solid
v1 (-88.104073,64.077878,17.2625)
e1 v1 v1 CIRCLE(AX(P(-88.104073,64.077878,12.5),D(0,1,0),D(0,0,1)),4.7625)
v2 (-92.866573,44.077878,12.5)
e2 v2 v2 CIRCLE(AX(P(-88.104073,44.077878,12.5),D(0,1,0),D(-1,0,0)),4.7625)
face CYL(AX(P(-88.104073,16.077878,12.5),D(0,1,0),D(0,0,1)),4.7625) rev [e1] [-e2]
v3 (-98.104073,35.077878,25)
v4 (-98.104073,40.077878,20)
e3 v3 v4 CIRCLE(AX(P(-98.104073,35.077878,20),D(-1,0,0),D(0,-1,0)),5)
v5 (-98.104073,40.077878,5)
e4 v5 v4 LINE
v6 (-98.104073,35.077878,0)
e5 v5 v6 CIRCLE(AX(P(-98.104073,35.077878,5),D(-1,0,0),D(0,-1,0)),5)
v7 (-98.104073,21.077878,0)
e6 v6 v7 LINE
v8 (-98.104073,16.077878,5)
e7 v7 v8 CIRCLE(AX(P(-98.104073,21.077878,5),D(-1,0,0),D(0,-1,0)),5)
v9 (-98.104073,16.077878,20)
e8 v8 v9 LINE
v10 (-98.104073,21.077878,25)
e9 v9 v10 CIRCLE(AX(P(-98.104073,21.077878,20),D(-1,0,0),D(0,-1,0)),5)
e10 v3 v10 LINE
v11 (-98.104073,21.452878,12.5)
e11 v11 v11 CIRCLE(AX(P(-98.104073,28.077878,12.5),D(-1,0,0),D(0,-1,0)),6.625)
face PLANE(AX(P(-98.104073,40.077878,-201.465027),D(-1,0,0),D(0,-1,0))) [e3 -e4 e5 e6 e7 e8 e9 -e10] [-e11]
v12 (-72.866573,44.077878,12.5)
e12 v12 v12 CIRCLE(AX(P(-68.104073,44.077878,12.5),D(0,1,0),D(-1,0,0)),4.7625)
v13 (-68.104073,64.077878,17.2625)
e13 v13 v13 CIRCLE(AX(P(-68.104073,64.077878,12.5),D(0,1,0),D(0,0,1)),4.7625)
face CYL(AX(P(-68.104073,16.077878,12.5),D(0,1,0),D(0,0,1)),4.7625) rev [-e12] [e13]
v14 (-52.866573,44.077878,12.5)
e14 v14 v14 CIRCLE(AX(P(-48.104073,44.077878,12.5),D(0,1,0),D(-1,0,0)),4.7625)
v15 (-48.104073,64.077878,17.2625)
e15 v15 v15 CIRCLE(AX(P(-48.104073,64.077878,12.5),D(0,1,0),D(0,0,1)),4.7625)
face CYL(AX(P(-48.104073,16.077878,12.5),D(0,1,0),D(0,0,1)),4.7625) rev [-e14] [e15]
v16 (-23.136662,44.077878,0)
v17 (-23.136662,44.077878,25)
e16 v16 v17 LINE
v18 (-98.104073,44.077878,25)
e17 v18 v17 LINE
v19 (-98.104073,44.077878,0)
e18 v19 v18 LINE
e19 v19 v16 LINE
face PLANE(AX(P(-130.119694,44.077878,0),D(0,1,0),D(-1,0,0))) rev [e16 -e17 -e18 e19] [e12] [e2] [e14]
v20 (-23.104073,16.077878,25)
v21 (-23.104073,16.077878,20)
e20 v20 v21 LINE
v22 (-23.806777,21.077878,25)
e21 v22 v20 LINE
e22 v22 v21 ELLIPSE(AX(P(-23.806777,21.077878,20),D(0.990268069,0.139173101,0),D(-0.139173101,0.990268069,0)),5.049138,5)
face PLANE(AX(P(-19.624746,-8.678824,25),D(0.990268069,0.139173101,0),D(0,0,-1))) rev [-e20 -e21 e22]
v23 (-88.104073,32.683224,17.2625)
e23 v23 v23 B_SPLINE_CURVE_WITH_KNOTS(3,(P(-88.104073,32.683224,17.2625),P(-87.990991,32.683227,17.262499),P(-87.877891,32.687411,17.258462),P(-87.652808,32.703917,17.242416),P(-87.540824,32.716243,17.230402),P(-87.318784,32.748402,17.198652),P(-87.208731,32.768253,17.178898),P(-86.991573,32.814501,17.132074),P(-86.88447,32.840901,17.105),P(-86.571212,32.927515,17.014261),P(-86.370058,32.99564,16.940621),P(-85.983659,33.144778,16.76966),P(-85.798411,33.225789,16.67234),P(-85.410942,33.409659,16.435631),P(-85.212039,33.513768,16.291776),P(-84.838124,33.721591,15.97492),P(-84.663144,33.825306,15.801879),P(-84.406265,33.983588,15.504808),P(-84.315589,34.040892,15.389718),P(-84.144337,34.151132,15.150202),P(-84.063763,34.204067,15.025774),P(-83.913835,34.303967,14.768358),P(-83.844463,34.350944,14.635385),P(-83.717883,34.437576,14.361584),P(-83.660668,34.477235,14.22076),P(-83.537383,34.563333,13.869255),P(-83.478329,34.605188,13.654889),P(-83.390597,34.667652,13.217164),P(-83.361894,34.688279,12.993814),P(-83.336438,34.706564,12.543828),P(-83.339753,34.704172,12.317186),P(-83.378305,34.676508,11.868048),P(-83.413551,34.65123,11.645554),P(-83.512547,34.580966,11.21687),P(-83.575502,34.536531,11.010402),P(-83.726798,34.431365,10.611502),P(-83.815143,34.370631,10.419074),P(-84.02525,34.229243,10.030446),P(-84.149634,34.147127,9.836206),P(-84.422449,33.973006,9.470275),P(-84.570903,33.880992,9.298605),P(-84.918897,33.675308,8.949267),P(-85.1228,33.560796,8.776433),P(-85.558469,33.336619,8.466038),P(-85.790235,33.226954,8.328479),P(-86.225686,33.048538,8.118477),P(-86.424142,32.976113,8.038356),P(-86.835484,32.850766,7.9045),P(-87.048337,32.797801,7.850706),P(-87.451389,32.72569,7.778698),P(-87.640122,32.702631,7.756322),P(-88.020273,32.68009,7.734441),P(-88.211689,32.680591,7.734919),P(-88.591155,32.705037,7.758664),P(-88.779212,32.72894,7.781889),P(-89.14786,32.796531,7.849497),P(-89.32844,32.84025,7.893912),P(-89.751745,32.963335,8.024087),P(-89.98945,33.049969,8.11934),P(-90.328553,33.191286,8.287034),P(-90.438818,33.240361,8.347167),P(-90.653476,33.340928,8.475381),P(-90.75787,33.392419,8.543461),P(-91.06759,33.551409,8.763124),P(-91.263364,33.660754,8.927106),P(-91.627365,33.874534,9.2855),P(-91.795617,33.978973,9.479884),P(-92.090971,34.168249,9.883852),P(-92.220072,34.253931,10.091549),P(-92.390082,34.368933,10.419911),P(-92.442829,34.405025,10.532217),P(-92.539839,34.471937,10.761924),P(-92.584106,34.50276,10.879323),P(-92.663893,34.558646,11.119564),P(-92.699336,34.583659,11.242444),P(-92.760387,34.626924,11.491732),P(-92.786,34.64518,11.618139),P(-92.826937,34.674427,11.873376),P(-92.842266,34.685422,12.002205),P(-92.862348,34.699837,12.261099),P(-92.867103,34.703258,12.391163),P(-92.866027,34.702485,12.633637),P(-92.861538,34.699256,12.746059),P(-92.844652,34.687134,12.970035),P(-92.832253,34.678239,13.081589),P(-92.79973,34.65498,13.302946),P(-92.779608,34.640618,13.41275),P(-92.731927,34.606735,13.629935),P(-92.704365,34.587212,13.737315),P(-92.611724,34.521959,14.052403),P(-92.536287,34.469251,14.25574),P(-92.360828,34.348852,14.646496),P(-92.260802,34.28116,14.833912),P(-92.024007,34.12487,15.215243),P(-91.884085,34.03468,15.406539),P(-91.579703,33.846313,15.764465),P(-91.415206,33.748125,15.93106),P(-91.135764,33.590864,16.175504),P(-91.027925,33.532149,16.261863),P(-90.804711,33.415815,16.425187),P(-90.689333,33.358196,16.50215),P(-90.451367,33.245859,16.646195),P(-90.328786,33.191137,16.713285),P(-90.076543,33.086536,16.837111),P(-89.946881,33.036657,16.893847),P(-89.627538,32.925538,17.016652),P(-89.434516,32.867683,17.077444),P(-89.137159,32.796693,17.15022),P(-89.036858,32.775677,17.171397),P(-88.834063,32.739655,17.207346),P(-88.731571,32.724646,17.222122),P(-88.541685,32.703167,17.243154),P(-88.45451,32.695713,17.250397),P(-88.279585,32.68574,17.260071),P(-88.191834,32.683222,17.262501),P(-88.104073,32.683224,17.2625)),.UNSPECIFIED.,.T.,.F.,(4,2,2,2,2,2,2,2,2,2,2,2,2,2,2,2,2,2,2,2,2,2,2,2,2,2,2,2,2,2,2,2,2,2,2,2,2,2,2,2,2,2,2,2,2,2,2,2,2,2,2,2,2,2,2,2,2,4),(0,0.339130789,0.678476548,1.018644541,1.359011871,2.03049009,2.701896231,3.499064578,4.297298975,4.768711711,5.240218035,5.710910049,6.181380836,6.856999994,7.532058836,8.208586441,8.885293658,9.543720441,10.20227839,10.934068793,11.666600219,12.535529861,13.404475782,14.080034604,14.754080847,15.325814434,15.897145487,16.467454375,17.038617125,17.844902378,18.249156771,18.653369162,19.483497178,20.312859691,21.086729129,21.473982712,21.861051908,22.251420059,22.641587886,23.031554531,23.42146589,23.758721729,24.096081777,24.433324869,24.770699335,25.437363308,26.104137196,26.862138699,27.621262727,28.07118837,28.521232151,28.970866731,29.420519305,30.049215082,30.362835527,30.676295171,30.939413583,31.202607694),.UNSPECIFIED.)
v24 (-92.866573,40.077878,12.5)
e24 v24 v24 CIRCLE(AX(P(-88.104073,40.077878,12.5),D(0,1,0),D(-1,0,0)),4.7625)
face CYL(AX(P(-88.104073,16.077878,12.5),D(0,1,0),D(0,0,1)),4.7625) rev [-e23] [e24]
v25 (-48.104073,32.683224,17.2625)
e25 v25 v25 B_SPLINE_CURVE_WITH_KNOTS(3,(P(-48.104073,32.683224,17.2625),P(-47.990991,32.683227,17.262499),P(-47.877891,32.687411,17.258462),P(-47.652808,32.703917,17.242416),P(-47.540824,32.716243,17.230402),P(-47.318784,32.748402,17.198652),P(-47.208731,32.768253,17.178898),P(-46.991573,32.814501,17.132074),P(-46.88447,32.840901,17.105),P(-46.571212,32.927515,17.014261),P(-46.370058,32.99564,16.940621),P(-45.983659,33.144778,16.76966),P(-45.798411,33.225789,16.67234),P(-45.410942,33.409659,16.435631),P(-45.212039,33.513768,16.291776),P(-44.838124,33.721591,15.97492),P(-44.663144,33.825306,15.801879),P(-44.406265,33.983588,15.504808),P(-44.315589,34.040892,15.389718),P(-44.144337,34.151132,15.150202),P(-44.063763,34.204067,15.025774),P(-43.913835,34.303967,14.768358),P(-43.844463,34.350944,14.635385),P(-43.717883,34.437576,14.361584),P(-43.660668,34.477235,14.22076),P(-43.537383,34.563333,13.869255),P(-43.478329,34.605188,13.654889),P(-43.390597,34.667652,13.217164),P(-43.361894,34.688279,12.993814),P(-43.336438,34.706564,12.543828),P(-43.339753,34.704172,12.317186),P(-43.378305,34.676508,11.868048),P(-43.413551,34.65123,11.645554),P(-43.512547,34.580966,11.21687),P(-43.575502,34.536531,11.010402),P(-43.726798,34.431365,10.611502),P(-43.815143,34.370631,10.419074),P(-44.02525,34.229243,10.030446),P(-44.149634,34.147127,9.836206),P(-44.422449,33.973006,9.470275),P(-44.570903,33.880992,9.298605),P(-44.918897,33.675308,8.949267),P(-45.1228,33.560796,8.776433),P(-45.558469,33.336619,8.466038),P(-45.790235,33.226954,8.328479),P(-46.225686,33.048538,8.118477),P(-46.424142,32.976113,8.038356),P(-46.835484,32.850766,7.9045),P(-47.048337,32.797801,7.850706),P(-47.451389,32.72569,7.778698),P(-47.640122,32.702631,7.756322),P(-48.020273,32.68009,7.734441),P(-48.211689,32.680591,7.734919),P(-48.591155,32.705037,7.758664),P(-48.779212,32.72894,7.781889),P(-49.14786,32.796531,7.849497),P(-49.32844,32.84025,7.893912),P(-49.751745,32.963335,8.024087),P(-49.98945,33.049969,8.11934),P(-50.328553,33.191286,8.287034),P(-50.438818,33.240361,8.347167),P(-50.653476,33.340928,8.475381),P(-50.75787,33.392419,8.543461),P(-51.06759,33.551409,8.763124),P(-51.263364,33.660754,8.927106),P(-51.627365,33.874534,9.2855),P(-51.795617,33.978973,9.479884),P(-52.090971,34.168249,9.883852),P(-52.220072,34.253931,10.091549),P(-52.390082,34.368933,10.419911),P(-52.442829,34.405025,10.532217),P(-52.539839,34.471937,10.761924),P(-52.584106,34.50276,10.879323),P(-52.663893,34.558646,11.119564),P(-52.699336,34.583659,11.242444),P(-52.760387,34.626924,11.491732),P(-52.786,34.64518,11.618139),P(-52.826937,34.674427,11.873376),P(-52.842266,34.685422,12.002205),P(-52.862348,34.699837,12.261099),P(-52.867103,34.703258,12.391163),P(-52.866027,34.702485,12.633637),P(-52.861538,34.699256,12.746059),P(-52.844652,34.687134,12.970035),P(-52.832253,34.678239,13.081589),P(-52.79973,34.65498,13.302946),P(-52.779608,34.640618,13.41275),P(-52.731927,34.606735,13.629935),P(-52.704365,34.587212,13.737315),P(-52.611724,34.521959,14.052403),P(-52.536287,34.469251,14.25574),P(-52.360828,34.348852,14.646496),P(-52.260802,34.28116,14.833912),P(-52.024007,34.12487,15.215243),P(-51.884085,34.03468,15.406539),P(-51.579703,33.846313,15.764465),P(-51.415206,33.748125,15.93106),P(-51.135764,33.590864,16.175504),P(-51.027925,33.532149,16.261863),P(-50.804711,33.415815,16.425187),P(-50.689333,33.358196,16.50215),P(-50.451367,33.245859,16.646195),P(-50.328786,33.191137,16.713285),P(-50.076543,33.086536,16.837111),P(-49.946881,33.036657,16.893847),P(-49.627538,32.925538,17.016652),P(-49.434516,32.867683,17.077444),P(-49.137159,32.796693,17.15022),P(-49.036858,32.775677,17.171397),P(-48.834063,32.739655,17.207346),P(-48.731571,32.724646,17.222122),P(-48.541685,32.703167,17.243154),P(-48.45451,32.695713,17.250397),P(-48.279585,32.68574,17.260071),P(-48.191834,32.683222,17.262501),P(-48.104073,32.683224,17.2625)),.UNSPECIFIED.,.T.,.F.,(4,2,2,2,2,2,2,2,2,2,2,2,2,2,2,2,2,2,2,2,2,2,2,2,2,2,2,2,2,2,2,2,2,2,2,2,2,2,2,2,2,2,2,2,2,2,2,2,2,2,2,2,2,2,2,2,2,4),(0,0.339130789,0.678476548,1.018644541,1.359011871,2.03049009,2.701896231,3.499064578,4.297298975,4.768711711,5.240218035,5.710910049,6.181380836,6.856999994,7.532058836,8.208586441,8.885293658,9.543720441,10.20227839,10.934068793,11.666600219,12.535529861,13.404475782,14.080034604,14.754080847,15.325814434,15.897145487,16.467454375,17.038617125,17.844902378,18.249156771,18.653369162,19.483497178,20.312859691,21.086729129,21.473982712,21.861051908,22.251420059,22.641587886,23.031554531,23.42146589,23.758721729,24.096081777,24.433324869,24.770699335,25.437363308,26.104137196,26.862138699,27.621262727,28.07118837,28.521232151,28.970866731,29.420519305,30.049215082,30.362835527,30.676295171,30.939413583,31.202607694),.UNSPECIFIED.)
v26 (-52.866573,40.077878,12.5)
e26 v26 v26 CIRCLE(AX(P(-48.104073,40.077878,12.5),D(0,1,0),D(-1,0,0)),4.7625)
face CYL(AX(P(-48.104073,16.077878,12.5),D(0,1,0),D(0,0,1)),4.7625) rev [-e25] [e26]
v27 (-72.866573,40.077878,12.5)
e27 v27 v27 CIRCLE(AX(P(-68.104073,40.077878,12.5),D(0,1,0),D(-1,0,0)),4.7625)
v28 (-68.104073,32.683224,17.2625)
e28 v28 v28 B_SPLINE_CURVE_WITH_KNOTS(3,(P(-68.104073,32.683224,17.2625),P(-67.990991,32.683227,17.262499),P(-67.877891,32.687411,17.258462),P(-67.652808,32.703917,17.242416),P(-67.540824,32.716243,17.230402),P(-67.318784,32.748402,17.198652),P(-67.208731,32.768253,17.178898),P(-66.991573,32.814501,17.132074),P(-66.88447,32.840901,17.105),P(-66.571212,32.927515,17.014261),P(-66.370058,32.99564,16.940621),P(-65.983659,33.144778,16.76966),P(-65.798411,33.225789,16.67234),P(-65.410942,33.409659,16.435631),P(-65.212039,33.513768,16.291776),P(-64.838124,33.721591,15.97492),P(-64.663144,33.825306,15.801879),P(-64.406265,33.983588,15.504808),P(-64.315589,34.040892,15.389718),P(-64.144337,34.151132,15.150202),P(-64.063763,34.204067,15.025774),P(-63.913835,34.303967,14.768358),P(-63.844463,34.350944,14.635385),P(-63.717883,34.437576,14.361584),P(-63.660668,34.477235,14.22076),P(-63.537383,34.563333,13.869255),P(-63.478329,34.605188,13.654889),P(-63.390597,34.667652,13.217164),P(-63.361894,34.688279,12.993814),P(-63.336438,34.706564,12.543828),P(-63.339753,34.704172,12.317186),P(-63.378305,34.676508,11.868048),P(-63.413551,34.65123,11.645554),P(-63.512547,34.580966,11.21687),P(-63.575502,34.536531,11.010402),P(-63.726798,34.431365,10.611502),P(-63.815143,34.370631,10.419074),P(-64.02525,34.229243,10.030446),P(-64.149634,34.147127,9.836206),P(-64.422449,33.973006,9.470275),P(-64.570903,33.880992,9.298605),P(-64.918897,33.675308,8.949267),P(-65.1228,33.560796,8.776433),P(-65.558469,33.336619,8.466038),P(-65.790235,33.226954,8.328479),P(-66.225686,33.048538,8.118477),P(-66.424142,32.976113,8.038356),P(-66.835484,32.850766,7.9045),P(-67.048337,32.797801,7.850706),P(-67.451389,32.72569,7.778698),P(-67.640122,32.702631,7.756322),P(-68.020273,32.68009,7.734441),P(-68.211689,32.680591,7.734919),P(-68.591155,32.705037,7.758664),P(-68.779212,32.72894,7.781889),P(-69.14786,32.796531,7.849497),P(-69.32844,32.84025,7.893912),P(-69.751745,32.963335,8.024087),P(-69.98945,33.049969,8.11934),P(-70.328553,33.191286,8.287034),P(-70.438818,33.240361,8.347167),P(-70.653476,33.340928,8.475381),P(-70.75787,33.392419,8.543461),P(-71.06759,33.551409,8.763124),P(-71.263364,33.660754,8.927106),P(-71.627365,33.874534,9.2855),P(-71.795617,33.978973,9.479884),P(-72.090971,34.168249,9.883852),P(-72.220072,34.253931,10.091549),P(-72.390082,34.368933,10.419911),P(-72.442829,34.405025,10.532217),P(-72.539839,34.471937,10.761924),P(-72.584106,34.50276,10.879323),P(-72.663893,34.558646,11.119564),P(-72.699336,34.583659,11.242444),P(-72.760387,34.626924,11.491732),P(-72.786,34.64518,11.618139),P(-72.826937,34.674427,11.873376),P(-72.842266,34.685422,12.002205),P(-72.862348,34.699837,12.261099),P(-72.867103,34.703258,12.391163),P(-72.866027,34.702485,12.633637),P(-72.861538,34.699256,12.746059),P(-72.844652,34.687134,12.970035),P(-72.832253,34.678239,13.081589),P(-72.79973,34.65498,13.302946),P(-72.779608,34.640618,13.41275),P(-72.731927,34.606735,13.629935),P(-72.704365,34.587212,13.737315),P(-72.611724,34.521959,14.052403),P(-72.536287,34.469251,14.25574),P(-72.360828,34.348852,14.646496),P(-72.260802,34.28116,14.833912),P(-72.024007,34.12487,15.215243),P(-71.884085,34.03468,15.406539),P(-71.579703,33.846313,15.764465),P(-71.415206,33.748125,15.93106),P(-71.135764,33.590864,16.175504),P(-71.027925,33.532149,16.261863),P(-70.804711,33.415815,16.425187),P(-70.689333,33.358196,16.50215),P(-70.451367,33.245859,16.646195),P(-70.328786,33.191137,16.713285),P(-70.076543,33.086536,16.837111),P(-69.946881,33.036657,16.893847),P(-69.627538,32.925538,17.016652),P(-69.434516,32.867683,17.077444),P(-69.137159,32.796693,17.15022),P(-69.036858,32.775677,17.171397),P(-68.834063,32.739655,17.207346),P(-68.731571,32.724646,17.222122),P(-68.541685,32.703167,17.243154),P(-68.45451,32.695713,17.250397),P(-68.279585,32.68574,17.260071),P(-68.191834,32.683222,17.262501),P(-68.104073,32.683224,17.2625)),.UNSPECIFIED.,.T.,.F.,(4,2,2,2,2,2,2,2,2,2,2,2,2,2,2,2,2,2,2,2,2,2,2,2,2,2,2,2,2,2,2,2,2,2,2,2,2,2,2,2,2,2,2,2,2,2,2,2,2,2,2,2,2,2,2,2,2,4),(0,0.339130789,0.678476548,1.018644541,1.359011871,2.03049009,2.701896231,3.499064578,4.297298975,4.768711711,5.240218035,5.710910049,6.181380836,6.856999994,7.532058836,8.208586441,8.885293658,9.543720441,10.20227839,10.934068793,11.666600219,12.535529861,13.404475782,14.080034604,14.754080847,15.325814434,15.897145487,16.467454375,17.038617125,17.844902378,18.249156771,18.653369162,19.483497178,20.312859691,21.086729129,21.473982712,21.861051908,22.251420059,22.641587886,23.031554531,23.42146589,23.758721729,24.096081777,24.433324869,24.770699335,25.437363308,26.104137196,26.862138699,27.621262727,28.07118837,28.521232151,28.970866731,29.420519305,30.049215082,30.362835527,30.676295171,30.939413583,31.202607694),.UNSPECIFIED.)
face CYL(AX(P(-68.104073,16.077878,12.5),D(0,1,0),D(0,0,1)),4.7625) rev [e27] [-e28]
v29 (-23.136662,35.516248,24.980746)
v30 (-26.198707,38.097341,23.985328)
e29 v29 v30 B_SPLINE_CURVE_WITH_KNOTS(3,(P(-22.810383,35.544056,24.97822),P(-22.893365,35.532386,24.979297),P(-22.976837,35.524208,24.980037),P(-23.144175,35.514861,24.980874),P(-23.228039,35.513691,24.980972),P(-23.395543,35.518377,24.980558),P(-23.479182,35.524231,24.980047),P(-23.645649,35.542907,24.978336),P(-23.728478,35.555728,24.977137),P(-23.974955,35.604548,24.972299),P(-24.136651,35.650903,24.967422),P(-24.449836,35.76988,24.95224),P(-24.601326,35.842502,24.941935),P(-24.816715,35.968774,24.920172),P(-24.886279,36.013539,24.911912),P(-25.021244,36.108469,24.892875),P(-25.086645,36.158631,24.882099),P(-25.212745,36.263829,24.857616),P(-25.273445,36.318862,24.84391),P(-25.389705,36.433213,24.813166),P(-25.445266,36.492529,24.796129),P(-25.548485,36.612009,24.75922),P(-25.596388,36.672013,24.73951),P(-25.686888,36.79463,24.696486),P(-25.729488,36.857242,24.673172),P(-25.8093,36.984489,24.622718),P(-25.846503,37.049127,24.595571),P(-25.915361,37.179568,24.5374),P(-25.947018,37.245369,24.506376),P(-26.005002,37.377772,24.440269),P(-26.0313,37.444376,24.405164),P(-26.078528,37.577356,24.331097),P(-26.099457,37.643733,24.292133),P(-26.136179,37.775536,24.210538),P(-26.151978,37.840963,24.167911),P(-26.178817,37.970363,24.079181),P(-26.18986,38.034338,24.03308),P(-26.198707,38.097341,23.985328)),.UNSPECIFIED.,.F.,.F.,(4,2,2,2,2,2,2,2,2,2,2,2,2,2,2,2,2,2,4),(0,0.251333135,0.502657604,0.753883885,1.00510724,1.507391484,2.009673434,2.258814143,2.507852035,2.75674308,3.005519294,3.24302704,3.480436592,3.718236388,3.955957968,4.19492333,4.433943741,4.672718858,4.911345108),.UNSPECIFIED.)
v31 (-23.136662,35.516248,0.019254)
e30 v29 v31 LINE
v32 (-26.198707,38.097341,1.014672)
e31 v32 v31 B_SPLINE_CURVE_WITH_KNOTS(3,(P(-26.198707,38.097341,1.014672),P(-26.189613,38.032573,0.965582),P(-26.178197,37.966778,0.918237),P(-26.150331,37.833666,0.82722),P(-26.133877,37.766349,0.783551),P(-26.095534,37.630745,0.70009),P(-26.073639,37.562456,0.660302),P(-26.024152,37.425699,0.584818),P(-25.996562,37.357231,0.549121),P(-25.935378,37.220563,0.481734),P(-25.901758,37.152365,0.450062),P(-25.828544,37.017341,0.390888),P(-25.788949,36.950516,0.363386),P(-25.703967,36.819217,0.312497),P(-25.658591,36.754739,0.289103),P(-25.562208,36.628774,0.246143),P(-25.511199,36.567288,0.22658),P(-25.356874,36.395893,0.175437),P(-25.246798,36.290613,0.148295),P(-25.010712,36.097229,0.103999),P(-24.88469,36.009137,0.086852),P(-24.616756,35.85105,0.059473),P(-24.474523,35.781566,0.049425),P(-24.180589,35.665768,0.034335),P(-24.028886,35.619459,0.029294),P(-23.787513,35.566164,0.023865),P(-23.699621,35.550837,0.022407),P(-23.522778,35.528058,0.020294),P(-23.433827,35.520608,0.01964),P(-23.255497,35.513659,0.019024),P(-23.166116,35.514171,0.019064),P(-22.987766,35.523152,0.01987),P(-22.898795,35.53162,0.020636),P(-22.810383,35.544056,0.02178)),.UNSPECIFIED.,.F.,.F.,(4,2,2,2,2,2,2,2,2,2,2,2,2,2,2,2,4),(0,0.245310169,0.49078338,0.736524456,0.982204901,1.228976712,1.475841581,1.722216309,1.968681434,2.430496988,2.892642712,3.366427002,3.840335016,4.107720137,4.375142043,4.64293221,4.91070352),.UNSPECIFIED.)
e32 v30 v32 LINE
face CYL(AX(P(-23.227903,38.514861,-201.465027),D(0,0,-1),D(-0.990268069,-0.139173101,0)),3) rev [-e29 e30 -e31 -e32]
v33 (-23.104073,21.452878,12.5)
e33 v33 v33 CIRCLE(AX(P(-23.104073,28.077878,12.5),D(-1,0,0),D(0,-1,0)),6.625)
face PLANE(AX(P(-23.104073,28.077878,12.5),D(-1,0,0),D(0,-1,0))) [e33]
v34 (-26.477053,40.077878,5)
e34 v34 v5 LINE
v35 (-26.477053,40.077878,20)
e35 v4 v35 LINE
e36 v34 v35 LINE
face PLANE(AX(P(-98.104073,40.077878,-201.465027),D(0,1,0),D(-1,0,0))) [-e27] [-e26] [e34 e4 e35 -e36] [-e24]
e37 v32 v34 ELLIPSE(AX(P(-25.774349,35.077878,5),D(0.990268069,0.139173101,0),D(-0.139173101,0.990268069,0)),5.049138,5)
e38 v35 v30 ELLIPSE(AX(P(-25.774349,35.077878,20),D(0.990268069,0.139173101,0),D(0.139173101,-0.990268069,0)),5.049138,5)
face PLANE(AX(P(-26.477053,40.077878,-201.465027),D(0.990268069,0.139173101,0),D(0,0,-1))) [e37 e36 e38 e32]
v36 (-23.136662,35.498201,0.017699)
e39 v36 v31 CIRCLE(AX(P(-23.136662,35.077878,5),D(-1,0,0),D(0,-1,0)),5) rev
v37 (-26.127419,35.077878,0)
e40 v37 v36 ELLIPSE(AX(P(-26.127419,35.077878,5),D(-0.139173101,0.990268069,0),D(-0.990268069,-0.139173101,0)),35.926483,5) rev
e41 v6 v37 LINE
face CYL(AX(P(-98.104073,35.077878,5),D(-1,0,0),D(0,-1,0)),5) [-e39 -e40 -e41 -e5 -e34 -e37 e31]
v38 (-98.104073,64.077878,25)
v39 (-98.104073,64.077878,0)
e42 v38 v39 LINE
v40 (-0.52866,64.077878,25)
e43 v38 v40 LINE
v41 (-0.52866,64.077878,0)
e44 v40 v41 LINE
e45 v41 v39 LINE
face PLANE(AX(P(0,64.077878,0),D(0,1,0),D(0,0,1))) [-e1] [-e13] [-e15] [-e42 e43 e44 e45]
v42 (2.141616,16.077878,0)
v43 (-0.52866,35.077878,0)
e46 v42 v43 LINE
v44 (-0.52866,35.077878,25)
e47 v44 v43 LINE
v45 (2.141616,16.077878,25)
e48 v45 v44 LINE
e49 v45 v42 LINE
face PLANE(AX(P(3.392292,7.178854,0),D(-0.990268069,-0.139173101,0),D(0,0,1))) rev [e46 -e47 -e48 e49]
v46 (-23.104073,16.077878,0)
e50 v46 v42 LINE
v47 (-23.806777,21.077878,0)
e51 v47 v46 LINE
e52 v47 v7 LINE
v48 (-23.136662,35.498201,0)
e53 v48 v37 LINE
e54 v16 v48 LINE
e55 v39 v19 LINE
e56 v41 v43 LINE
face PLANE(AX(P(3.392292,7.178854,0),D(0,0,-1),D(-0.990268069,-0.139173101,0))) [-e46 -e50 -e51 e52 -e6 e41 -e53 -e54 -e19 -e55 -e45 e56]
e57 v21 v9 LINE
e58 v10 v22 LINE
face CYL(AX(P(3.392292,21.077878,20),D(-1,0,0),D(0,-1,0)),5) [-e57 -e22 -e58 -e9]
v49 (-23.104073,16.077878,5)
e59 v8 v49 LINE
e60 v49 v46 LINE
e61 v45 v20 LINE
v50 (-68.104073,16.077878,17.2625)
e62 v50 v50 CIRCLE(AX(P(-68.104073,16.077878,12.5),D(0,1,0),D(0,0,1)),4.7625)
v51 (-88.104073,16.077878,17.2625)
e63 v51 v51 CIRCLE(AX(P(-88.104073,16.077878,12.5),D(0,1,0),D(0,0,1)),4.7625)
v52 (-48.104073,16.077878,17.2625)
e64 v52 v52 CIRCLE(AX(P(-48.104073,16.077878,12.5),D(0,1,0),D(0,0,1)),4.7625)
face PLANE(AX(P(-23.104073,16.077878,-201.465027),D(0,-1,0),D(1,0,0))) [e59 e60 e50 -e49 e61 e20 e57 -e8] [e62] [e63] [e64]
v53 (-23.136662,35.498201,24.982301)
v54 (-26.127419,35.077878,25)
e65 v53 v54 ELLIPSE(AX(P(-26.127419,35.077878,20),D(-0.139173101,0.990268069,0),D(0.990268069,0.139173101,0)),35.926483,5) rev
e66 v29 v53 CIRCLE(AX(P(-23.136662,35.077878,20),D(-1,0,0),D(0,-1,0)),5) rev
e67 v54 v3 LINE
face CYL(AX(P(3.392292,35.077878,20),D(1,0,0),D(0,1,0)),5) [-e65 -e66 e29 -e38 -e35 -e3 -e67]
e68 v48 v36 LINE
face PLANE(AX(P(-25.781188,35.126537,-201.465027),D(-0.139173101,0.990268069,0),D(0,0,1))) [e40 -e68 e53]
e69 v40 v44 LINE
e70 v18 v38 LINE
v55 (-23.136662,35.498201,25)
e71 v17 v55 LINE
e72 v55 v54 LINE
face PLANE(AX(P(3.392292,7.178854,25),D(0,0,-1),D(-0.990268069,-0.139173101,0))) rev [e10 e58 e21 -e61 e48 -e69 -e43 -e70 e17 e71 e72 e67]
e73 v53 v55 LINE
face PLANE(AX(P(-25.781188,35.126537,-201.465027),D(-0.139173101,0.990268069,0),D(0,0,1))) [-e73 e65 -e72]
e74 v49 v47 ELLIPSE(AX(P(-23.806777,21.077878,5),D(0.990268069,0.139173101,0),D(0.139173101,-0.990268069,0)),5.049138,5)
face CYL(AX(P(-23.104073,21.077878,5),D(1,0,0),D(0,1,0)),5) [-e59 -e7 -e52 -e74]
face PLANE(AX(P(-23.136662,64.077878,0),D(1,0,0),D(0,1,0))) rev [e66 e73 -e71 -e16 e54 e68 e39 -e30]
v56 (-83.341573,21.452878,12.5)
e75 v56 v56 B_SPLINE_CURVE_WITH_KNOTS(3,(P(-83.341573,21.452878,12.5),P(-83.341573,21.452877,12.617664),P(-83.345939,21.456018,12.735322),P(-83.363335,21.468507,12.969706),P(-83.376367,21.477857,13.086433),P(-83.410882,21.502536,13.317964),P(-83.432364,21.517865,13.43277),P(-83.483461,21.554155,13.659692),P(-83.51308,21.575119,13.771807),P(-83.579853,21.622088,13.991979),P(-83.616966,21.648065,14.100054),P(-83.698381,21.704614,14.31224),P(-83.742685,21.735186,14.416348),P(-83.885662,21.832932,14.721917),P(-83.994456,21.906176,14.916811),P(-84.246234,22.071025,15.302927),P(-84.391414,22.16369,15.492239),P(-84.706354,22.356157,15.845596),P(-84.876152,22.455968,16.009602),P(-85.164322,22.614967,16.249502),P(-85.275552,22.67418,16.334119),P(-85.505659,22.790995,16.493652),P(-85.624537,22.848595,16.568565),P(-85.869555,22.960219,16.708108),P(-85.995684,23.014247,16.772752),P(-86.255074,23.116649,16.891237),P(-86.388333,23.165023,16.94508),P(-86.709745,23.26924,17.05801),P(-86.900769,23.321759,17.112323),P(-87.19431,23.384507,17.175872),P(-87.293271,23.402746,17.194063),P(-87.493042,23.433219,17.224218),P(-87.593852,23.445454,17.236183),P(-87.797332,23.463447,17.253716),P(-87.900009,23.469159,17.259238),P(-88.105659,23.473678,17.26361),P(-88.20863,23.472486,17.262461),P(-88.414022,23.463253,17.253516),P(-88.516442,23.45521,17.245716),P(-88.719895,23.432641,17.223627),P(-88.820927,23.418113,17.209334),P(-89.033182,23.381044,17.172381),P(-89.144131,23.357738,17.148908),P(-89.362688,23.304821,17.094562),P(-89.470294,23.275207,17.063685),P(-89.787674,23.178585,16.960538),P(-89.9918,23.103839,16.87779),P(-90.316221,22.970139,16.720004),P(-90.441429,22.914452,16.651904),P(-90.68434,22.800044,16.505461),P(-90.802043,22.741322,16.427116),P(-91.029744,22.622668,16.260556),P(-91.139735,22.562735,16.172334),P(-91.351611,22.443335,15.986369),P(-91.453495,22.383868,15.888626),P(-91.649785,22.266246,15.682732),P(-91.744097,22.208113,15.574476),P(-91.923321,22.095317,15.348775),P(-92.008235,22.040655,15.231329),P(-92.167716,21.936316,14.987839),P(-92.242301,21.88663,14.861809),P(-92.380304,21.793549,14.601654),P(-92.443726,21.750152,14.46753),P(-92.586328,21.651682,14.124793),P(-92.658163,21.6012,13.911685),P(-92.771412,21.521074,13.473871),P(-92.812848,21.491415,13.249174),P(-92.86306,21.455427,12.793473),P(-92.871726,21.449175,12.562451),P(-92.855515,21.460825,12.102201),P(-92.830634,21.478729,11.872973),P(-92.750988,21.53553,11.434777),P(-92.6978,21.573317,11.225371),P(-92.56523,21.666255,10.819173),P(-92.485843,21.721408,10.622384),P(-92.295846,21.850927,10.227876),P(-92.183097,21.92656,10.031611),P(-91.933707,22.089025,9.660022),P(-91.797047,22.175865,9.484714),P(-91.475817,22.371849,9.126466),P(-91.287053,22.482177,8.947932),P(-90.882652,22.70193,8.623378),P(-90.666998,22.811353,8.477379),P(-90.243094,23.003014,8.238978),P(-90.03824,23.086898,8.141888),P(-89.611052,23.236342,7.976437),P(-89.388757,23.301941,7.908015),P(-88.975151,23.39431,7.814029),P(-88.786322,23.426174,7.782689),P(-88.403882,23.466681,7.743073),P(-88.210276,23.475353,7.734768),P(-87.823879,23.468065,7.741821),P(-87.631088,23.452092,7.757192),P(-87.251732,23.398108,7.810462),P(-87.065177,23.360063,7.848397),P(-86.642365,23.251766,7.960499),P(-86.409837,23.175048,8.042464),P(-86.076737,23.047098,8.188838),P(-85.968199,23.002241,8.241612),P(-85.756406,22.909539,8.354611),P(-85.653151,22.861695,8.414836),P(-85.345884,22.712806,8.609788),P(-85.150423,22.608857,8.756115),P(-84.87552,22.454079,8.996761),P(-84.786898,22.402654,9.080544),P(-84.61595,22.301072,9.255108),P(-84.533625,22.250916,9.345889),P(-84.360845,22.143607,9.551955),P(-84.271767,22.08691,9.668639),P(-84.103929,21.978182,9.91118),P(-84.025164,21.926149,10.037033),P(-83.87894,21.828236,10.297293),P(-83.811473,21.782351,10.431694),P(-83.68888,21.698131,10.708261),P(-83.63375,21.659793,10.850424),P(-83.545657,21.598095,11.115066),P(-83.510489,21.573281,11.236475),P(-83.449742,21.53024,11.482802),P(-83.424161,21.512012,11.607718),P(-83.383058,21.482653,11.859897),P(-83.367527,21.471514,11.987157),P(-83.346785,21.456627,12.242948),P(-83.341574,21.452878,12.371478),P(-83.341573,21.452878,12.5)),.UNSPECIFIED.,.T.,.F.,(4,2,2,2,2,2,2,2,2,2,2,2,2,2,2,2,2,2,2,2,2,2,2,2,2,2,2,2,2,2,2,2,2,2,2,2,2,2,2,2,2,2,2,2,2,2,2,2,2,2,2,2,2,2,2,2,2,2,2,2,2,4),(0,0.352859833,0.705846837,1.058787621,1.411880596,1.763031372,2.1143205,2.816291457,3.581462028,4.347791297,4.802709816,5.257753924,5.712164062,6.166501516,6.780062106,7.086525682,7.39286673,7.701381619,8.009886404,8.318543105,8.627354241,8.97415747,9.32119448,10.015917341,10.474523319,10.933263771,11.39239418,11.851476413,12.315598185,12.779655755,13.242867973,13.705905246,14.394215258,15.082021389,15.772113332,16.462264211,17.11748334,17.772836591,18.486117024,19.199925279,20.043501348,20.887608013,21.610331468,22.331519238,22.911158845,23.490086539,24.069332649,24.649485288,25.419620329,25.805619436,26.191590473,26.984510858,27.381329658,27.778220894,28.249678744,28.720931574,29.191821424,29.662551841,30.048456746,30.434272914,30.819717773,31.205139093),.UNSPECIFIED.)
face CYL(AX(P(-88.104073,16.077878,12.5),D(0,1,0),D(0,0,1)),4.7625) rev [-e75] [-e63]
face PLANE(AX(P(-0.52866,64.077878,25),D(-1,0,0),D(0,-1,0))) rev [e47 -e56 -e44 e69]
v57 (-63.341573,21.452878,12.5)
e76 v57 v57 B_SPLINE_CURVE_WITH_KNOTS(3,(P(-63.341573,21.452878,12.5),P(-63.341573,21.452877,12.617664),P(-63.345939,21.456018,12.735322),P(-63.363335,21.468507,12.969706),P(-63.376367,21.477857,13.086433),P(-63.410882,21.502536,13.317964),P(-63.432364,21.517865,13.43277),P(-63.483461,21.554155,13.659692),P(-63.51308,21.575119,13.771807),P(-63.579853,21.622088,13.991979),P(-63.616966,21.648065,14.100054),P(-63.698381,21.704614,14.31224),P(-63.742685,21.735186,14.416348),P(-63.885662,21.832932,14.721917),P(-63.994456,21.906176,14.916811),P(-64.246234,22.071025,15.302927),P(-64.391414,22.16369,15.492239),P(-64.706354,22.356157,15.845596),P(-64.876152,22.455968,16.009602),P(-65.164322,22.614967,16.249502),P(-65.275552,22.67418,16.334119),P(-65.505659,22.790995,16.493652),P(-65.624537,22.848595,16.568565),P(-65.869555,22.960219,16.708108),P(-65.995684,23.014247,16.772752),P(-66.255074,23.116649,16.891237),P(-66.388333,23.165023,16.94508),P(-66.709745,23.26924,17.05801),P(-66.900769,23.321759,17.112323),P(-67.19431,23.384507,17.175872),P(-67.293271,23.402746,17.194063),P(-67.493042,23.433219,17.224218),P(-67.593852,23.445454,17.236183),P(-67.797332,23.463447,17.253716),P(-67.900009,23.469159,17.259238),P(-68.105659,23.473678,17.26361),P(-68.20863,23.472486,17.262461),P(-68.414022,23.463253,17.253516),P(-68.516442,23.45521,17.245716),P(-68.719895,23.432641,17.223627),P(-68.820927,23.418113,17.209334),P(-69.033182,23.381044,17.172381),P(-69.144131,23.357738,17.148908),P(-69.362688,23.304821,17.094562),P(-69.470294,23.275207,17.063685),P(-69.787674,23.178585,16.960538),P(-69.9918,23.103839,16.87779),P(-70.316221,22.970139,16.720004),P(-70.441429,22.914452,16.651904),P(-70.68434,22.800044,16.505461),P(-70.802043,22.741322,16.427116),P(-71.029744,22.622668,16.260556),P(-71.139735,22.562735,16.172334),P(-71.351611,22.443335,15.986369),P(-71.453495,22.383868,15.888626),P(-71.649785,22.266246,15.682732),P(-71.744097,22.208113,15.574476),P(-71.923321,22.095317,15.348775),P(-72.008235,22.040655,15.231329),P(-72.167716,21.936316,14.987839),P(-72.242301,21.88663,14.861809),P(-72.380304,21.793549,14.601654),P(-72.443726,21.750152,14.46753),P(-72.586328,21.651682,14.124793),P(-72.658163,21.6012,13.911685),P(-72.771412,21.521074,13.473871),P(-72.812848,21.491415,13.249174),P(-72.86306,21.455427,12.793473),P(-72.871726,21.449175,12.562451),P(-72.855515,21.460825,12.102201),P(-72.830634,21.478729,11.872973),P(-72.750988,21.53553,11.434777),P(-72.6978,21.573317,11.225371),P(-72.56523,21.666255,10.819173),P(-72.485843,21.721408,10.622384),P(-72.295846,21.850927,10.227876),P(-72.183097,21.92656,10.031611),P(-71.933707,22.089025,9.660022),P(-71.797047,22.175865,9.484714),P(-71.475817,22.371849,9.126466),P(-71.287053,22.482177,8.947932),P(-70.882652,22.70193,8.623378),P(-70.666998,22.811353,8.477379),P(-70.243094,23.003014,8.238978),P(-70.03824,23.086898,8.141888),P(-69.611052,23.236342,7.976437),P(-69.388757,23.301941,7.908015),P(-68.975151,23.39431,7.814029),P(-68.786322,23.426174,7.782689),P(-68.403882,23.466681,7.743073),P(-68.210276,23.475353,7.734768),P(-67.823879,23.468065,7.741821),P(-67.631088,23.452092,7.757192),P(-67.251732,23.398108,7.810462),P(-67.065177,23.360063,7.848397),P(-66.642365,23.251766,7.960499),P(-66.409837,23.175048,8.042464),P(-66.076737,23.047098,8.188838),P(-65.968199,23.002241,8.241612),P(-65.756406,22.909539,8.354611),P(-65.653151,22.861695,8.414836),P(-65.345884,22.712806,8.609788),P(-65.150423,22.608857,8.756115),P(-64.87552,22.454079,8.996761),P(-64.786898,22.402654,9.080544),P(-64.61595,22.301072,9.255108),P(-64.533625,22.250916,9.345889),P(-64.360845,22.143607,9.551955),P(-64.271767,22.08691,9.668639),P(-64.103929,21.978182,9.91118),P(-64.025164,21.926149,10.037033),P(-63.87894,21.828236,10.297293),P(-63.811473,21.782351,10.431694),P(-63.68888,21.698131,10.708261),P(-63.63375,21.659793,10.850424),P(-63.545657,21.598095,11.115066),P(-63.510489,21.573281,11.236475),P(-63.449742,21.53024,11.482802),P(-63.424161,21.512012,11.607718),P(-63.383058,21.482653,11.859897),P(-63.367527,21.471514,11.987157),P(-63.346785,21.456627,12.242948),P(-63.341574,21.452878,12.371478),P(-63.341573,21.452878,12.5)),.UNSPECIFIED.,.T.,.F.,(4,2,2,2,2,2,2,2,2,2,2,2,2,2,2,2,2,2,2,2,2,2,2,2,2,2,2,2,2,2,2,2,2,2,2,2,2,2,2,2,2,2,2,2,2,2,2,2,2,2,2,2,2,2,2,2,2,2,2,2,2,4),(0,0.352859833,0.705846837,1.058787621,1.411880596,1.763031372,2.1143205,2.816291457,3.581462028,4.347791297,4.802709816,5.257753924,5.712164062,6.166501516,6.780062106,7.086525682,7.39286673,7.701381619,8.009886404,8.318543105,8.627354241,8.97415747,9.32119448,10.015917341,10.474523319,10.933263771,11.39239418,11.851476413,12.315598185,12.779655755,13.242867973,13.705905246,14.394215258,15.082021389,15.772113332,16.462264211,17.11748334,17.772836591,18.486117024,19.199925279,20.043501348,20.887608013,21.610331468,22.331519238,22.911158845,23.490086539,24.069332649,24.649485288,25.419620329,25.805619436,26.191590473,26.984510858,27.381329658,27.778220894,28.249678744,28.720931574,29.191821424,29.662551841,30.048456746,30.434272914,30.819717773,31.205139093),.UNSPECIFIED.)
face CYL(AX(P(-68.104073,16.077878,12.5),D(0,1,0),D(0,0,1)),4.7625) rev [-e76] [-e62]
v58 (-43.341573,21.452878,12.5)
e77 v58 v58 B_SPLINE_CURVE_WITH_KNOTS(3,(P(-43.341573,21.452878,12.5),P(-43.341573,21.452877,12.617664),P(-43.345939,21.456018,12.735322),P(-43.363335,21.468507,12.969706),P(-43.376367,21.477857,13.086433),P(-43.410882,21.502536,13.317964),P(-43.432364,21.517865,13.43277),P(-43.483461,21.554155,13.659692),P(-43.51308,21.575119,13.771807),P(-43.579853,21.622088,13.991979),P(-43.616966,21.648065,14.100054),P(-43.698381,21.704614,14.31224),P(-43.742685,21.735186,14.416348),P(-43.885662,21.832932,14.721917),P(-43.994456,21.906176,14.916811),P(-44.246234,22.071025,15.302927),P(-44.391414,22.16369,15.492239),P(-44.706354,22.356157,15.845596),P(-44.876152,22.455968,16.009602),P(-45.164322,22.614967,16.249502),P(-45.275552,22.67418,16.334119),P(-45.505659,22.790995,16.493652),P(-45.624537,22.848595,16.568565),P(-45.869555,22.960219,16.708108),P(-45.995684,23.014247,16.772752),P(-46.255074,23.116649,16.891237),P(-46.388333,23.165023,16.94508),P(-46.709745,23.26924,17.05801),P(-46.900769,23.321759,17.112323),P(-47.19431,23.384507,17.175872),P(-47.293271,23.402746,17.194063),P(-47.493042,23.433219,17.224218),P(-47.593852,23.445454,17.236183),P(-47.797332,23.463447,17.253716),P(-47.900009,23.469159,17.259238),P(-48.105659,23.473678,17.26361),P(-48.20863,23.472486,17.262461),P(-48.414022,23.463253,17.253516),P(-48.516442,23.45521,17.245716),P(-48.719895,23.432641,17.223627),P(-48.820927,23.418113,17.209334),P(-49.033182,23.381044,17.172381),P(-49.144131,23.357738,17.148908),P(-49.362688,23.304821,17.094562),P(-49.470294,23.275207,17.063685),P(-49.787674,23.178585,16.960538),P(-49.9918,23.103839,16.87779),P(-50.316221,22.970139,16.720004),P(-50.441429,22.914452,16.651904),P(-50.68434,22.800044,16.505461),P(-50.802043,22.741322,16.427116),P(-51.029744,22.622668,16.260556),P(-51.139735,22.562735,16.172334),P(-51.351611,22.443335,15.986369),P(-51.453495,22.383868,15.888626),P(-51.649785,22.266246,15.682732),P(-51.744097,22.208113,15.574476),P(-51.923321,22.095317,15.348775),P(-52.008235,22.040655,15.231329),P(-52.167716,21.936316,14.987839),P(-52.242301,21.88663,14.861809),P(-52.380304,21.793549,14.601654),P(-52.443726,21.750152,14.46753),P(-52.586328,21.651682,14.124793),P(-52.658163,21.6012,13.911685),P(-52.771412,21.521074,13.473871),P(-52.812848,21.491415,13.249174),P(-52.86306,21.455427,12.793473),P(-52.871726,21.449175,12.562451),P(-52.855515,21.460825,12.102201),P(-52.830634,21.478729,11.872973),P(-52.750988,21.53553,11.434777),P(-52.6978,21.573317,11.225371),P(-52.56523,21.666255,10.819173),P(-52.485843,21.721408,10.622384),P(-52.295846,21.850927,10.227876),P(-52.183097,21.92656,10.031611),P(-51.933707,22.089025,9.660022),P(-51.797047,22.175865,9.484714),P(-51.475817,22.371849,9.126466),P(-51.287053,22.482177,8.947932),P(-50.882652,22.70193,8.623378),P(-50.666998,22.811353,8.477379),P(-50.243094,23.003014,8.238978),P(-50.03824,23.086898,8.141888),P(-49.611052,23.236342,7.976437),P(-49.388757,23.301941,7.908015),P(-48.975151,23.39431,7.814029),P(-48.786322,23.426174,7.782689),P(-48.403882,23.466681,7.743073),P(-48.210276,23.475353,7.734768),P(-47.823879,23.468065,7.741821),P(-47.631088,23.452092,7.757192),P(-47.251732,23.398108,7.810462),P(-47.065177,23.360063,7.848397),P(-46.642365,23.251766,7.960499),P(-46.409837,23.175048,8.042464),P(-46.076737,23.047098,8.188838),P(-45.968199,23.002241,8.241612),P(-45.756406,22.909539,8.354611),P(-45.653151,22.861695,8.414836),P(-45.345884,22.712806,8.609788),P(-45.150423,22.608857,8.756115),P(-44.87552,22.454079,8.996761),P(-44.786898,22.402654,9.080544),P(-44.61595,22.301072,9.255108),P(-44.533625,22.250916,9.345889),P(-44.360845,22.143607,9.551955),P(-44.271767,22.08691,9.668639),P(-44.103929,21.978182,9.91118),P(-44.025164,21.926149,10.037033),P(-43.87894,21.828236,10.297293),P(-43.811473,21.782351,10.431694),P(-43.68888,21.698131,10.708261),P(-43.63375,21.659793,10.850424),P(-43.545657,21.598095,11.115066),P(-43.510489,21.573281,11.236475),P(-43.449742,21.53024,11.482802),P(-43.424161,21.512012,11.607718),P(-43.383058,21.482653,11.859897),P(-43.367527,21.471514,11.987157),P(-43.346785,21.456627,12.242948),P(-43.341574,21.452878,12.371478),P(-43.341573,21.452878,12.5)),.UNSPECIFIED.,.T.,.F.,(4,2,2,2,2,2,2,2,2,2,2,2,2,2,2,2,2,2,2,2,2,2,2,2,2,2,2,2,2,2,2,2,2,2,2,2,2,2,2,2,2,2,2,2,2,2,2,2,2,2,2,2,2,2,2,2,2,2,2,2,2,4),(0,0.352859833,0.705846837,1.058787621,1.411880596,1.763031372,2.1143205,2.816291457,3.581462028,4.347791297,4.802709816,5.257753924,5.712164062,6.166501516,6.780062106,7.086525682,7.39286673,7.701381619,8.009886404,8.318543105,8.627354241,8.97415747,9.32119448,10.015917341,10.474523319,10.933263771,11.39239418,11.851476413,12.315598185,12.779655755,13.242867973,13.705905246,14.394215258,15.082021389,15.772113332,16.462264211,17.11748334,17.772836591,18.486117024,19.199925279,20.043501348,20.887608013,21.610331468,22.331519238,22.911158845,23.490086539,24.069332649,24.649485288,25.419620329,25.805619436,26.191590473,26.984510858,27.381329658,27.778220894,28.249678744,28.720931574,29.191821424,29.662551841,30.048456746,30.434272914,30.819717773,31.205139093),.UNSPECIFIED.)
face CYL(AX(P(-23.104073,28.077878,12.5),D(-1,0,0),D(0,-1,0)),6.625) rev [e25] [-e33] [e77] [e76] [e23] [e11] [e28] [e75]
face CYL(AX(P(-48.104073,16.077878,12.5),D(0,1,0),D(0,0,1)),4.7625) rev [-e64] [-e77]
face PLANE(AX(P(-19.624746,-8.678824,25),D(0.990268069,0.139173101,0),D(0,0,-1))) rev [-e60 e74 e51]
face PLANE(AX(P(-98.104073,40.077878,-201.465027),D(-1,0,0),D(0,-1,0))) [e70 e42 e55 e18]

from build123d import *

# Parameters (mm, degrees)
SKETCH1_W                = 50
SKETCH1_H                = 25
BOSS_EXTRUDE1_DEPTH      = 25
BOSS_EXTRUDE2_DEPTH      = 25
SKETCH4_R                = 6.625
CUT_EXTRUDE1_DEPTH       = 75
SKETCH9_R                = 3.1
CUT_EXTRUDE6_DEPTH       = 116.938210964
FILLET3_R                = 5
FILLET5_R                = 3
SKETCH10_W               = 47.732743957
SKETCH10_H               = 107.667843513
CUT_EXTRUDE7_DEPTH       = 100
SKETCH11_W               = 28.236029243
SKETCH11_H               = 25
CUT_EXTRUDE8_DEPTH       = 111.285013225
SKETCH12_W               = 27.477268163
SKETCH12_H               = 27.699456316
CUT_EXTRUDE9_DEPTH       = 5
BODY_MOVE_COPY1_ANGLE    = 8
SKETCH13_W               = 22.608001889
SKETCH13_H               = 25
BOSS_EXTRUDE3_DEPTH      = 29
SKETCH14_W               = 25
SKETCH14_H               = 20
BOSS_EXTRUDE4_DEPTH      = 74.967411564
CUT_EXTRUDE10_DEPTH      = 113.041997451
CUT_EXTRUDE10_DEPTH_BACK = 113.041997451
SKETCH15_R               = 4.7625
SKETCH15_R_2             = 3.1


with BuildPart() as part:
    # Sketch1 → Boss-Extrude1 (new body)
    with BuildSketch(Plane.XY):
        Rectangle(SKETCH1_W, SKETCH1_H)
    extrude(amount=BOSS_EXTRUDE1_DEPTH)

    # Sketch3 → Boss-Extrude2 (add)
    with BuildSketch(Plane.XY.offset(25)):
        Polygon((-25, 12.5), (-99.270105156, 22.937982572), (-95.929950733, 46.704416222), (-25, 36.73586174), (-25, 31.73586174), (25, 31.73586174), (25, 36.73586174), (95.929950733, 46.704416222), (99.270105156, 22.937982572), (25, 12.5), align=None)
    extrude(amount=-BOSS_EXTRUDE2_DEPTH)

    # Sketch4 → Cut-Extrude1 (cut)
    with BuildSketch(Plane(origin=(-100.508609829, 14.12556392, 0), x_dir=(0, 0, 1), z_dir=(-0.9902680687415705, 0.13917310096006502, 0))):
        with Locations(Location((12.5, 20.899023335, 0), (0, 0, 270))):
            Circle(SKETCH4_R)
    cut_extrude1 = extrude(amount=-CUT_EXTRUDE1_DEPTH, mode=Mode.SUBTRACT)

    # Mirror1: Cut-Extrude1 across plane
    add(cut_extrude1.mirror(Plane(origin=(0, 0, 0), x_dir=(0, 0, 1), z_dir=(1, 0, 0))), mode=Mode.SUBTRACT)

    # Sketch9 → Cut-Extrude6 (cut, through all)
    with BuildSketch(Plane(origin=(4.578659096, 32.578852302, 0), x_dir=(0.9902680687415703, -0.1391731009600656, 0), z_dir=(0.1391731009600656, 0.9902680687415703, 0))):
        with Locations(Location((-91.496365481, -12.5, 0), (0, 0, 180))):
            Circle(SKETCH9_R)
        with Locations(Location((-71.496365481, -12.5, 0), (0, 0, 180))):
            Circle(SKETCH9_R)
        with Locations(Location((-51.496365481, -12.5, 0), (0, 0, 180))):
            Circle(SKETCH9_R)
    extrude(amount=-CUT_EXTRUDE6_DEPTH, mode=Mode.SUBTRACT)

    # Fillet3
    # the kernel refuses this fillet: 5 mm, written as the material it takes off along each edge
    with BuildSketch(Plane(origin=(111.648456015, 24.677646334, 25), x_dir=(-0.13917310096006577, 0.9902680687415704, 0), z_dir=(-0.9902680687415703, -0.13917310096006574, 0))) as fillet3_piece_1_section:
        with BuildLine():
            CenterArc((FILLET3_R, FILLET3_R), FILLET3_R, 180, 90)
            Line((0, FILLET3_R), (0, 0))
            Line((0, 0), (FILLET3_R, 0))
        make_face()
    fillet3_piece_1 = extrude(amount=100, mode=Mode.PRIVATE)
    fillet3_piece_1 = split(fillet3_piece_1, bisect_by=Plane(origin=(25, 18.834233779, 23.882189323), z_dir=(1, 0, 0)), keep=Keep.TOP, mode=Mode.PRIVATE)
    add(fillet3_piece_1, mode=Mode.SUBTRACT)
    with BuildSketch(Plane(origin=(12.621649141, 34.996197978, 25), x_dir=(0.13917310096006597, -0.9902680687415704, 0), z_dir=(0.9902680687415703, 0.13917310096006597, 0))) as fillet3_piece_2_section:
        with BuildLine():
            CenterArc((FILLET3_R, FILLET3_R), FILLET3_R, 180, 90)
            Line((0, FILLET3_R), (0, 0))
            Line((0, 0), (FILLET3_R, 0))
        make_face()
    fillet3_piece_2 = extrude(amount=96.627019967, mode=Mode.PRIVATE)
    fillet3_piece_2 = split(fillet3_piece_2, bisect_by=Plane(origin=(60.542812169, 31.73586174, 23.884172665), z_dir=(0, 1, 0)), keep=Keep.TOP, mode=Mode.PRIVATE)
    add(fillet3_piece_2, mode=Mode.SUBTRACT)
    with BuildSketch(Plane(origin=(-108.308301592, 48.444079984, 25), x_dir=(-0.13917310096006566, -0.9902680687415704, 0), z_dir=(0.9902680687415704, -0.13917310096006566, 0))) as fillet3_piece_3_section:
        with BuildLine():
            CenterArc((FILLET3_R, FILLET3_R), FILLET3_R, 180, 90)
            Line((0, FILLET3_R), (0, 0))
            Line((0, 0), (FILLET3_R, 0))
        make_face()
    fillet3_piece_3 = extrude(amount=96.627019967, mode=Mode.PRIVATE)
    fillet3_piece_3 = split(fillet3_piece_3, bisect_by=Plane(origin=(-60.542812169, 31.73586174, 23.884172665), z_dir=(0, 1, 0)), keep=Keep.TOP, mode=Mode.PRIVATE)
    add(fillet3_piece_3, mode=Mode.SUBTRACT)
    with BuildSketch(Plane(origin=(-12.621649141, 10.760336238, 25), x_dir=(0.13917310096006563, 0.9902680687415704, 0), z_dir=(-0.9902680687415703, 0.13917310096006563, 0))) as fillet3_piece_4_section:
        with BuildLine():
            CenterArc((FILLET3_R, FILLET3_R), FILLET3_R, 180, 90)
            Line((0, FILLET3_R), (0, 0))
            Line((0, 0), (FILLET3_R, 0))
        make_face()
    fillet3_piece_4 = extrude(amount=100, mode=Mode.PRIVATE)
    fillet3_piece_4 = split(fillet3_piece_4, bisect_by=Plane(origin=(-25, 18.834233779, 23.882189323), z_dir=(-1, 0, 0)), keep=Keep.TOP, mode=Mode.PRIVATE)
    add(fillet3_piece_4, mode=Mode.SUBTRACT)
    with BuildSketch(Plane(origin=(111.648456015, 24.677646334, 0), x_dir=(-0.13917310096006577, 0.9902680687415704, 0), z_dir=(-0.9902680687415703, -0.13917310096006574, 0))) as fillet3_piece_5_section:
        with BuildLine():
            CenterArc((FILLET3_R, -FILLET3_R), FILLET3_R, 90, 90)
            Line((0, -FILLET3_R), (0, 0))
            Line((0, 0), (FILLET3_R, 0))
        make_face()
    fillet3_piece_5 = extrude(amount=100, mode=Mode.PRIVATE)
    fillet3_piece_5 = split(fillet3_piece_5, bisect_by=Plane(origin=(25, 18.834233779, 1.117810677), z_dir=(1, 0, 0)), keep=Keep.TOP, mode=Mode.PRIVATE)
    add(fillet3_piece_5, mode=Mode.SUBTRACT)
    with BuildSketch(Plane(origin=(12.621649141, 34.996197978, 0), x_dir=(0.13917310096006597, -0.9902680687415704, 0), z_dir=(0.9902680687415703, 0.13917310096006597, 0))) as fillet3_piece_6_section:
        with BuildLine():
            CenterArc((FILLET3_R, -FILLET3_R), FILLET3_R, 90, 90)
            Line((0, -FILLET3_R), (0, 0))
            Line((0, 0), (FILLET3_R, 0))
        make_face()
    fillet3_piece_6 = extrude(amount=96.627019967, mode=Mode.PRIVATE)
    fillet3_piece_6 = split(fillet3_piece_6, bisect_by=Plane(origin=(60.542812169, 31.73586174, 1.115827335), z_dir=(0, 1, 0)), keep=Keep.TOP, mode=Mode.PRIVATE)
    add(fillet3_piece_6, mode=Mode.SUBTRACT)
    with BuildSketch(Plane(origin=(-108.308301592, 48.444079984, 0), x_dir=(-0.13917310096006566, -0.9902680687415704, 0), z_dir=(0.9902680687415704, -0.13917310096006566, 0))) as fillet3_piece_7_section:
        with BuildLine():
            CenterArc((FILLET3_R, -FILLET3_R), FILLET3_R, 90, 90)
            Line((0, -FILLET3_R), (0, 0))
            Line((0, 0), (FILLET3_R, 0))
        make_face()
    fillet3_piece_7 = extrude(amount=96.627019967, mode=Mode.PRIVATE)
    fillet3_piece_7 = split(fillet3_piece_7, bisect_by=Plane(origin=(-60.542812169, 31.73586174, 1.115827335), z_dir=(0, 1, 0)), keep=Keep.TOP, mode=Mode.PRIVATE)
    add(fillet3_piece_7, mode=Mode.SUBTRACT)
    with BuildSketch(Plane(origin=(-12.621649141, 10.760336238, 0), x_dir=(0.13917310096006563, 0.9902680687415704, 0), z_dir=(-0.9902680687415703, 0.13917310096006563, 0))) as fillet3_piece_8_section:
        with BuildLine():
            CenterArc((FILLET3_R, -FILLET3_R), FILLET3_R, 90, 90)
            Line((0, -FILLET3_R), (0, 0))
            Line((0, 0), (FILLET3_R, 0))
        make_face()
    fillet3_piece_8 = extrude(amount=100, mode=Mode.PRIVATE)
    fillet3_piece_8 = split(fillet3_piece_8, bisect_by=Plane(origin=(-25, 18.834233779, 1.117810677), z_dir=(-1, 0, 0)), keep=Keep.TOP, mode=Mode.PRIVATE)
    add(fillet3_piece_8, mode=Mode.SUBTRACT)

    # Fillet5
    fillet5_edges = [part.edges().sort_by_distance(p)[0] for p in [
        (25, 31.73586174, 12.5),
        (-25, 31.73586174, 12.5),
    ]]
    fillet(fillet5_edges, radius=FILLET5_R)

    # Sketch10 → Cut-Extrude7 (cut)
    with BuildSketch(Plane(origin=(0, 0, 0), x_dir=(0, 0, -1), z_dir=(1, 0, 0))):
        with Locations((-11.782214376, 4.002620484)):
            Rectangle(SKETCH10_W, SKETCH10_H)
    extrude(amount=CUT_EXTRUDE7_DEPTH, mode=Mode.SUBTRACT)

    # Sketch11 → Cut-Extrude8 (cut, through all)
    with BuildSketch(Plane(origin=(1.238504673, 8.812418652, 0), x_dir=(0.9902680687415703, -0.13917310096006563, 0), z_dir=(-0.13917310096006563, -0.9902680687415703, 0))):
        with Locations((-12.37835086, 12.5)):
            Rectangle(SKETCH11_W, SKETCH11_H)
    extrude(amount=CUT_EXTRUDE8_DEPTH, mode=Mode.SUBTRACT)

    # Sketch12 → Cut-Extrude9 (cut)
    with BuildSketch(Plane(origin=(4.578659096, 32.578852302, 0), x_dir=(0.9902680687415703, -0.1391731009600656, 0), z_dir=(0.1391731009600656, 0.9902680687415703, 0))):
        with Locations((-12.790319835, -12.604422979)):
            Rectangle(SKETCH12_W, SKETCH12_H)
    extrude(amount=-CUT_EXTRUDE9_DEPTH, mode=Mode.SUBTRACT)


with BuildPart() as part_1:
    # Body-Move/Copy1: moved
    add(part.part.rotate(Axis((-49.635052578, 27.845447677, 0), (0, 0, 1)), BODY_MOVE_COPY1_ANGLE))

    # Sketch13 → Boss-Extrude3 (add)
    with BuildSketch(Plane(origin=(0, 35.077877501, 0), x_dir=(1, 0, 0), z_dir=(0, 1, 0))):
        with Locations((-11.832660591, -12.5)):
            Rectangle(SKETCH13_W, SKETCH13_H)
    extrude(amount=BOSS_EXTRUDE3_DEPTH)

    # Sketch14 → Boss-Extrude4 (add)
    with BuildSketch(Plane.ZY.offset(23.136661535)):
        with Locations((12.5, 54.077877501)):
            Rectangle(SKETCH14_W, SKETCH14_H)
    extrude(amount=BOSS_EXTRUDE4_DEPTH)

    # Sketch15 → Cut-Extrude10 (cut, two sides: drawn at the far end of the back side and taken through both)
    # profile 1 of 6: a face of its own
    with BuildSketch(Plane(origin=(0, 64.077877501, 0), x_dir=(1, 0, 0), z_dir=(0, 1, 0)).offset(-CUT_EXTRUDE10_DEPTH_BACK)):
        with Locations(Location((-88.104073099, -12.5, 0), (0, 0, 270))):
            Circle(SKETCH15_R)
        with Locations((-88.104073099, -12.5)):
            Circle(SKETCH15_R_2, mode=Mode.SUBTRACT)
    # profile 2 of 6: a face of its own
    with BuildSketch(Plane(origin=(0, 64.077877501, 0), x_dir=(1, 0, 0), z_dir=(0, 1, 0)).offset(-CUT_EXTRUDE10_DEPTH_BACK)):
        with Locations((-88.104073099, -12.5)):
            Circle(SKETCH15_R_2)
    # profile 3 of 6: a face of its own
    with BuildSketch(Plane(origin=(0, 64.077877501, 0), x_dir=(1, 0, 0), z_dir=(0, 1, 0)).offset(-CUT_EXTRUDE10_DEPTH_BACK)):
        with Locations(Location((-68.104073099, -12.5, 0), (0, 0, 270))):
            Circle(SKETCH15_R)
        with Locations((-68.104073099, -12.5)):
            Circle(SKETCH15_R_2, mode=Mode.SUBTRACT)
    # profile 4 of 6: a face of its own
    with BuildSketch(Plane(origin=(0, 64.077877501, 0), x_dir=(1, 0, 0), z_dir=(0, 1, 0)).offset(-CUT_EXTRUDE10_DEPTH_BACK)):
        with Locations((-68.104073099, -12.5)):
            Circle(SKETCH15_R_2)
    # profile 5 of 6: a face of its own
    with BuildSketch(Plane(origin=(0, 64.077877501, 0), x_dir=(1, 0, 0), z_dir=(0, 1, 0)).offset(-CUT_EXTRUDE10_DEPTH_BACK)):
        with Locations(Location((-48.104073099, -12.5, 0), (0, 0, 270))):
            Circle(SKETCH15_R)
        with Locations((-48.104073099, -12.5)):
            Circle(SKETCH15_R_2, mode=Mode.SUBTRACT)
    # profile 6 of 6: a face of its own
    with BuildSketch(Plane(origin=(0, 64.077877501, 0), x_dir=(1, 0, 0), z_dir=(0, 1, 0)).offset(-CUT_EXTRUDE10_DEPTH_BACK)):
        with Locations((-48.104073099, -12.5)):
            Circle(SKETCH15_R_2)
    extrude(amount=CUT_EXTRUDE10_DEPTH + CUT_EXTRUDE10_DEPTH_BACK, mode=Mode.SUBTRACT)


solid = part_1.part
